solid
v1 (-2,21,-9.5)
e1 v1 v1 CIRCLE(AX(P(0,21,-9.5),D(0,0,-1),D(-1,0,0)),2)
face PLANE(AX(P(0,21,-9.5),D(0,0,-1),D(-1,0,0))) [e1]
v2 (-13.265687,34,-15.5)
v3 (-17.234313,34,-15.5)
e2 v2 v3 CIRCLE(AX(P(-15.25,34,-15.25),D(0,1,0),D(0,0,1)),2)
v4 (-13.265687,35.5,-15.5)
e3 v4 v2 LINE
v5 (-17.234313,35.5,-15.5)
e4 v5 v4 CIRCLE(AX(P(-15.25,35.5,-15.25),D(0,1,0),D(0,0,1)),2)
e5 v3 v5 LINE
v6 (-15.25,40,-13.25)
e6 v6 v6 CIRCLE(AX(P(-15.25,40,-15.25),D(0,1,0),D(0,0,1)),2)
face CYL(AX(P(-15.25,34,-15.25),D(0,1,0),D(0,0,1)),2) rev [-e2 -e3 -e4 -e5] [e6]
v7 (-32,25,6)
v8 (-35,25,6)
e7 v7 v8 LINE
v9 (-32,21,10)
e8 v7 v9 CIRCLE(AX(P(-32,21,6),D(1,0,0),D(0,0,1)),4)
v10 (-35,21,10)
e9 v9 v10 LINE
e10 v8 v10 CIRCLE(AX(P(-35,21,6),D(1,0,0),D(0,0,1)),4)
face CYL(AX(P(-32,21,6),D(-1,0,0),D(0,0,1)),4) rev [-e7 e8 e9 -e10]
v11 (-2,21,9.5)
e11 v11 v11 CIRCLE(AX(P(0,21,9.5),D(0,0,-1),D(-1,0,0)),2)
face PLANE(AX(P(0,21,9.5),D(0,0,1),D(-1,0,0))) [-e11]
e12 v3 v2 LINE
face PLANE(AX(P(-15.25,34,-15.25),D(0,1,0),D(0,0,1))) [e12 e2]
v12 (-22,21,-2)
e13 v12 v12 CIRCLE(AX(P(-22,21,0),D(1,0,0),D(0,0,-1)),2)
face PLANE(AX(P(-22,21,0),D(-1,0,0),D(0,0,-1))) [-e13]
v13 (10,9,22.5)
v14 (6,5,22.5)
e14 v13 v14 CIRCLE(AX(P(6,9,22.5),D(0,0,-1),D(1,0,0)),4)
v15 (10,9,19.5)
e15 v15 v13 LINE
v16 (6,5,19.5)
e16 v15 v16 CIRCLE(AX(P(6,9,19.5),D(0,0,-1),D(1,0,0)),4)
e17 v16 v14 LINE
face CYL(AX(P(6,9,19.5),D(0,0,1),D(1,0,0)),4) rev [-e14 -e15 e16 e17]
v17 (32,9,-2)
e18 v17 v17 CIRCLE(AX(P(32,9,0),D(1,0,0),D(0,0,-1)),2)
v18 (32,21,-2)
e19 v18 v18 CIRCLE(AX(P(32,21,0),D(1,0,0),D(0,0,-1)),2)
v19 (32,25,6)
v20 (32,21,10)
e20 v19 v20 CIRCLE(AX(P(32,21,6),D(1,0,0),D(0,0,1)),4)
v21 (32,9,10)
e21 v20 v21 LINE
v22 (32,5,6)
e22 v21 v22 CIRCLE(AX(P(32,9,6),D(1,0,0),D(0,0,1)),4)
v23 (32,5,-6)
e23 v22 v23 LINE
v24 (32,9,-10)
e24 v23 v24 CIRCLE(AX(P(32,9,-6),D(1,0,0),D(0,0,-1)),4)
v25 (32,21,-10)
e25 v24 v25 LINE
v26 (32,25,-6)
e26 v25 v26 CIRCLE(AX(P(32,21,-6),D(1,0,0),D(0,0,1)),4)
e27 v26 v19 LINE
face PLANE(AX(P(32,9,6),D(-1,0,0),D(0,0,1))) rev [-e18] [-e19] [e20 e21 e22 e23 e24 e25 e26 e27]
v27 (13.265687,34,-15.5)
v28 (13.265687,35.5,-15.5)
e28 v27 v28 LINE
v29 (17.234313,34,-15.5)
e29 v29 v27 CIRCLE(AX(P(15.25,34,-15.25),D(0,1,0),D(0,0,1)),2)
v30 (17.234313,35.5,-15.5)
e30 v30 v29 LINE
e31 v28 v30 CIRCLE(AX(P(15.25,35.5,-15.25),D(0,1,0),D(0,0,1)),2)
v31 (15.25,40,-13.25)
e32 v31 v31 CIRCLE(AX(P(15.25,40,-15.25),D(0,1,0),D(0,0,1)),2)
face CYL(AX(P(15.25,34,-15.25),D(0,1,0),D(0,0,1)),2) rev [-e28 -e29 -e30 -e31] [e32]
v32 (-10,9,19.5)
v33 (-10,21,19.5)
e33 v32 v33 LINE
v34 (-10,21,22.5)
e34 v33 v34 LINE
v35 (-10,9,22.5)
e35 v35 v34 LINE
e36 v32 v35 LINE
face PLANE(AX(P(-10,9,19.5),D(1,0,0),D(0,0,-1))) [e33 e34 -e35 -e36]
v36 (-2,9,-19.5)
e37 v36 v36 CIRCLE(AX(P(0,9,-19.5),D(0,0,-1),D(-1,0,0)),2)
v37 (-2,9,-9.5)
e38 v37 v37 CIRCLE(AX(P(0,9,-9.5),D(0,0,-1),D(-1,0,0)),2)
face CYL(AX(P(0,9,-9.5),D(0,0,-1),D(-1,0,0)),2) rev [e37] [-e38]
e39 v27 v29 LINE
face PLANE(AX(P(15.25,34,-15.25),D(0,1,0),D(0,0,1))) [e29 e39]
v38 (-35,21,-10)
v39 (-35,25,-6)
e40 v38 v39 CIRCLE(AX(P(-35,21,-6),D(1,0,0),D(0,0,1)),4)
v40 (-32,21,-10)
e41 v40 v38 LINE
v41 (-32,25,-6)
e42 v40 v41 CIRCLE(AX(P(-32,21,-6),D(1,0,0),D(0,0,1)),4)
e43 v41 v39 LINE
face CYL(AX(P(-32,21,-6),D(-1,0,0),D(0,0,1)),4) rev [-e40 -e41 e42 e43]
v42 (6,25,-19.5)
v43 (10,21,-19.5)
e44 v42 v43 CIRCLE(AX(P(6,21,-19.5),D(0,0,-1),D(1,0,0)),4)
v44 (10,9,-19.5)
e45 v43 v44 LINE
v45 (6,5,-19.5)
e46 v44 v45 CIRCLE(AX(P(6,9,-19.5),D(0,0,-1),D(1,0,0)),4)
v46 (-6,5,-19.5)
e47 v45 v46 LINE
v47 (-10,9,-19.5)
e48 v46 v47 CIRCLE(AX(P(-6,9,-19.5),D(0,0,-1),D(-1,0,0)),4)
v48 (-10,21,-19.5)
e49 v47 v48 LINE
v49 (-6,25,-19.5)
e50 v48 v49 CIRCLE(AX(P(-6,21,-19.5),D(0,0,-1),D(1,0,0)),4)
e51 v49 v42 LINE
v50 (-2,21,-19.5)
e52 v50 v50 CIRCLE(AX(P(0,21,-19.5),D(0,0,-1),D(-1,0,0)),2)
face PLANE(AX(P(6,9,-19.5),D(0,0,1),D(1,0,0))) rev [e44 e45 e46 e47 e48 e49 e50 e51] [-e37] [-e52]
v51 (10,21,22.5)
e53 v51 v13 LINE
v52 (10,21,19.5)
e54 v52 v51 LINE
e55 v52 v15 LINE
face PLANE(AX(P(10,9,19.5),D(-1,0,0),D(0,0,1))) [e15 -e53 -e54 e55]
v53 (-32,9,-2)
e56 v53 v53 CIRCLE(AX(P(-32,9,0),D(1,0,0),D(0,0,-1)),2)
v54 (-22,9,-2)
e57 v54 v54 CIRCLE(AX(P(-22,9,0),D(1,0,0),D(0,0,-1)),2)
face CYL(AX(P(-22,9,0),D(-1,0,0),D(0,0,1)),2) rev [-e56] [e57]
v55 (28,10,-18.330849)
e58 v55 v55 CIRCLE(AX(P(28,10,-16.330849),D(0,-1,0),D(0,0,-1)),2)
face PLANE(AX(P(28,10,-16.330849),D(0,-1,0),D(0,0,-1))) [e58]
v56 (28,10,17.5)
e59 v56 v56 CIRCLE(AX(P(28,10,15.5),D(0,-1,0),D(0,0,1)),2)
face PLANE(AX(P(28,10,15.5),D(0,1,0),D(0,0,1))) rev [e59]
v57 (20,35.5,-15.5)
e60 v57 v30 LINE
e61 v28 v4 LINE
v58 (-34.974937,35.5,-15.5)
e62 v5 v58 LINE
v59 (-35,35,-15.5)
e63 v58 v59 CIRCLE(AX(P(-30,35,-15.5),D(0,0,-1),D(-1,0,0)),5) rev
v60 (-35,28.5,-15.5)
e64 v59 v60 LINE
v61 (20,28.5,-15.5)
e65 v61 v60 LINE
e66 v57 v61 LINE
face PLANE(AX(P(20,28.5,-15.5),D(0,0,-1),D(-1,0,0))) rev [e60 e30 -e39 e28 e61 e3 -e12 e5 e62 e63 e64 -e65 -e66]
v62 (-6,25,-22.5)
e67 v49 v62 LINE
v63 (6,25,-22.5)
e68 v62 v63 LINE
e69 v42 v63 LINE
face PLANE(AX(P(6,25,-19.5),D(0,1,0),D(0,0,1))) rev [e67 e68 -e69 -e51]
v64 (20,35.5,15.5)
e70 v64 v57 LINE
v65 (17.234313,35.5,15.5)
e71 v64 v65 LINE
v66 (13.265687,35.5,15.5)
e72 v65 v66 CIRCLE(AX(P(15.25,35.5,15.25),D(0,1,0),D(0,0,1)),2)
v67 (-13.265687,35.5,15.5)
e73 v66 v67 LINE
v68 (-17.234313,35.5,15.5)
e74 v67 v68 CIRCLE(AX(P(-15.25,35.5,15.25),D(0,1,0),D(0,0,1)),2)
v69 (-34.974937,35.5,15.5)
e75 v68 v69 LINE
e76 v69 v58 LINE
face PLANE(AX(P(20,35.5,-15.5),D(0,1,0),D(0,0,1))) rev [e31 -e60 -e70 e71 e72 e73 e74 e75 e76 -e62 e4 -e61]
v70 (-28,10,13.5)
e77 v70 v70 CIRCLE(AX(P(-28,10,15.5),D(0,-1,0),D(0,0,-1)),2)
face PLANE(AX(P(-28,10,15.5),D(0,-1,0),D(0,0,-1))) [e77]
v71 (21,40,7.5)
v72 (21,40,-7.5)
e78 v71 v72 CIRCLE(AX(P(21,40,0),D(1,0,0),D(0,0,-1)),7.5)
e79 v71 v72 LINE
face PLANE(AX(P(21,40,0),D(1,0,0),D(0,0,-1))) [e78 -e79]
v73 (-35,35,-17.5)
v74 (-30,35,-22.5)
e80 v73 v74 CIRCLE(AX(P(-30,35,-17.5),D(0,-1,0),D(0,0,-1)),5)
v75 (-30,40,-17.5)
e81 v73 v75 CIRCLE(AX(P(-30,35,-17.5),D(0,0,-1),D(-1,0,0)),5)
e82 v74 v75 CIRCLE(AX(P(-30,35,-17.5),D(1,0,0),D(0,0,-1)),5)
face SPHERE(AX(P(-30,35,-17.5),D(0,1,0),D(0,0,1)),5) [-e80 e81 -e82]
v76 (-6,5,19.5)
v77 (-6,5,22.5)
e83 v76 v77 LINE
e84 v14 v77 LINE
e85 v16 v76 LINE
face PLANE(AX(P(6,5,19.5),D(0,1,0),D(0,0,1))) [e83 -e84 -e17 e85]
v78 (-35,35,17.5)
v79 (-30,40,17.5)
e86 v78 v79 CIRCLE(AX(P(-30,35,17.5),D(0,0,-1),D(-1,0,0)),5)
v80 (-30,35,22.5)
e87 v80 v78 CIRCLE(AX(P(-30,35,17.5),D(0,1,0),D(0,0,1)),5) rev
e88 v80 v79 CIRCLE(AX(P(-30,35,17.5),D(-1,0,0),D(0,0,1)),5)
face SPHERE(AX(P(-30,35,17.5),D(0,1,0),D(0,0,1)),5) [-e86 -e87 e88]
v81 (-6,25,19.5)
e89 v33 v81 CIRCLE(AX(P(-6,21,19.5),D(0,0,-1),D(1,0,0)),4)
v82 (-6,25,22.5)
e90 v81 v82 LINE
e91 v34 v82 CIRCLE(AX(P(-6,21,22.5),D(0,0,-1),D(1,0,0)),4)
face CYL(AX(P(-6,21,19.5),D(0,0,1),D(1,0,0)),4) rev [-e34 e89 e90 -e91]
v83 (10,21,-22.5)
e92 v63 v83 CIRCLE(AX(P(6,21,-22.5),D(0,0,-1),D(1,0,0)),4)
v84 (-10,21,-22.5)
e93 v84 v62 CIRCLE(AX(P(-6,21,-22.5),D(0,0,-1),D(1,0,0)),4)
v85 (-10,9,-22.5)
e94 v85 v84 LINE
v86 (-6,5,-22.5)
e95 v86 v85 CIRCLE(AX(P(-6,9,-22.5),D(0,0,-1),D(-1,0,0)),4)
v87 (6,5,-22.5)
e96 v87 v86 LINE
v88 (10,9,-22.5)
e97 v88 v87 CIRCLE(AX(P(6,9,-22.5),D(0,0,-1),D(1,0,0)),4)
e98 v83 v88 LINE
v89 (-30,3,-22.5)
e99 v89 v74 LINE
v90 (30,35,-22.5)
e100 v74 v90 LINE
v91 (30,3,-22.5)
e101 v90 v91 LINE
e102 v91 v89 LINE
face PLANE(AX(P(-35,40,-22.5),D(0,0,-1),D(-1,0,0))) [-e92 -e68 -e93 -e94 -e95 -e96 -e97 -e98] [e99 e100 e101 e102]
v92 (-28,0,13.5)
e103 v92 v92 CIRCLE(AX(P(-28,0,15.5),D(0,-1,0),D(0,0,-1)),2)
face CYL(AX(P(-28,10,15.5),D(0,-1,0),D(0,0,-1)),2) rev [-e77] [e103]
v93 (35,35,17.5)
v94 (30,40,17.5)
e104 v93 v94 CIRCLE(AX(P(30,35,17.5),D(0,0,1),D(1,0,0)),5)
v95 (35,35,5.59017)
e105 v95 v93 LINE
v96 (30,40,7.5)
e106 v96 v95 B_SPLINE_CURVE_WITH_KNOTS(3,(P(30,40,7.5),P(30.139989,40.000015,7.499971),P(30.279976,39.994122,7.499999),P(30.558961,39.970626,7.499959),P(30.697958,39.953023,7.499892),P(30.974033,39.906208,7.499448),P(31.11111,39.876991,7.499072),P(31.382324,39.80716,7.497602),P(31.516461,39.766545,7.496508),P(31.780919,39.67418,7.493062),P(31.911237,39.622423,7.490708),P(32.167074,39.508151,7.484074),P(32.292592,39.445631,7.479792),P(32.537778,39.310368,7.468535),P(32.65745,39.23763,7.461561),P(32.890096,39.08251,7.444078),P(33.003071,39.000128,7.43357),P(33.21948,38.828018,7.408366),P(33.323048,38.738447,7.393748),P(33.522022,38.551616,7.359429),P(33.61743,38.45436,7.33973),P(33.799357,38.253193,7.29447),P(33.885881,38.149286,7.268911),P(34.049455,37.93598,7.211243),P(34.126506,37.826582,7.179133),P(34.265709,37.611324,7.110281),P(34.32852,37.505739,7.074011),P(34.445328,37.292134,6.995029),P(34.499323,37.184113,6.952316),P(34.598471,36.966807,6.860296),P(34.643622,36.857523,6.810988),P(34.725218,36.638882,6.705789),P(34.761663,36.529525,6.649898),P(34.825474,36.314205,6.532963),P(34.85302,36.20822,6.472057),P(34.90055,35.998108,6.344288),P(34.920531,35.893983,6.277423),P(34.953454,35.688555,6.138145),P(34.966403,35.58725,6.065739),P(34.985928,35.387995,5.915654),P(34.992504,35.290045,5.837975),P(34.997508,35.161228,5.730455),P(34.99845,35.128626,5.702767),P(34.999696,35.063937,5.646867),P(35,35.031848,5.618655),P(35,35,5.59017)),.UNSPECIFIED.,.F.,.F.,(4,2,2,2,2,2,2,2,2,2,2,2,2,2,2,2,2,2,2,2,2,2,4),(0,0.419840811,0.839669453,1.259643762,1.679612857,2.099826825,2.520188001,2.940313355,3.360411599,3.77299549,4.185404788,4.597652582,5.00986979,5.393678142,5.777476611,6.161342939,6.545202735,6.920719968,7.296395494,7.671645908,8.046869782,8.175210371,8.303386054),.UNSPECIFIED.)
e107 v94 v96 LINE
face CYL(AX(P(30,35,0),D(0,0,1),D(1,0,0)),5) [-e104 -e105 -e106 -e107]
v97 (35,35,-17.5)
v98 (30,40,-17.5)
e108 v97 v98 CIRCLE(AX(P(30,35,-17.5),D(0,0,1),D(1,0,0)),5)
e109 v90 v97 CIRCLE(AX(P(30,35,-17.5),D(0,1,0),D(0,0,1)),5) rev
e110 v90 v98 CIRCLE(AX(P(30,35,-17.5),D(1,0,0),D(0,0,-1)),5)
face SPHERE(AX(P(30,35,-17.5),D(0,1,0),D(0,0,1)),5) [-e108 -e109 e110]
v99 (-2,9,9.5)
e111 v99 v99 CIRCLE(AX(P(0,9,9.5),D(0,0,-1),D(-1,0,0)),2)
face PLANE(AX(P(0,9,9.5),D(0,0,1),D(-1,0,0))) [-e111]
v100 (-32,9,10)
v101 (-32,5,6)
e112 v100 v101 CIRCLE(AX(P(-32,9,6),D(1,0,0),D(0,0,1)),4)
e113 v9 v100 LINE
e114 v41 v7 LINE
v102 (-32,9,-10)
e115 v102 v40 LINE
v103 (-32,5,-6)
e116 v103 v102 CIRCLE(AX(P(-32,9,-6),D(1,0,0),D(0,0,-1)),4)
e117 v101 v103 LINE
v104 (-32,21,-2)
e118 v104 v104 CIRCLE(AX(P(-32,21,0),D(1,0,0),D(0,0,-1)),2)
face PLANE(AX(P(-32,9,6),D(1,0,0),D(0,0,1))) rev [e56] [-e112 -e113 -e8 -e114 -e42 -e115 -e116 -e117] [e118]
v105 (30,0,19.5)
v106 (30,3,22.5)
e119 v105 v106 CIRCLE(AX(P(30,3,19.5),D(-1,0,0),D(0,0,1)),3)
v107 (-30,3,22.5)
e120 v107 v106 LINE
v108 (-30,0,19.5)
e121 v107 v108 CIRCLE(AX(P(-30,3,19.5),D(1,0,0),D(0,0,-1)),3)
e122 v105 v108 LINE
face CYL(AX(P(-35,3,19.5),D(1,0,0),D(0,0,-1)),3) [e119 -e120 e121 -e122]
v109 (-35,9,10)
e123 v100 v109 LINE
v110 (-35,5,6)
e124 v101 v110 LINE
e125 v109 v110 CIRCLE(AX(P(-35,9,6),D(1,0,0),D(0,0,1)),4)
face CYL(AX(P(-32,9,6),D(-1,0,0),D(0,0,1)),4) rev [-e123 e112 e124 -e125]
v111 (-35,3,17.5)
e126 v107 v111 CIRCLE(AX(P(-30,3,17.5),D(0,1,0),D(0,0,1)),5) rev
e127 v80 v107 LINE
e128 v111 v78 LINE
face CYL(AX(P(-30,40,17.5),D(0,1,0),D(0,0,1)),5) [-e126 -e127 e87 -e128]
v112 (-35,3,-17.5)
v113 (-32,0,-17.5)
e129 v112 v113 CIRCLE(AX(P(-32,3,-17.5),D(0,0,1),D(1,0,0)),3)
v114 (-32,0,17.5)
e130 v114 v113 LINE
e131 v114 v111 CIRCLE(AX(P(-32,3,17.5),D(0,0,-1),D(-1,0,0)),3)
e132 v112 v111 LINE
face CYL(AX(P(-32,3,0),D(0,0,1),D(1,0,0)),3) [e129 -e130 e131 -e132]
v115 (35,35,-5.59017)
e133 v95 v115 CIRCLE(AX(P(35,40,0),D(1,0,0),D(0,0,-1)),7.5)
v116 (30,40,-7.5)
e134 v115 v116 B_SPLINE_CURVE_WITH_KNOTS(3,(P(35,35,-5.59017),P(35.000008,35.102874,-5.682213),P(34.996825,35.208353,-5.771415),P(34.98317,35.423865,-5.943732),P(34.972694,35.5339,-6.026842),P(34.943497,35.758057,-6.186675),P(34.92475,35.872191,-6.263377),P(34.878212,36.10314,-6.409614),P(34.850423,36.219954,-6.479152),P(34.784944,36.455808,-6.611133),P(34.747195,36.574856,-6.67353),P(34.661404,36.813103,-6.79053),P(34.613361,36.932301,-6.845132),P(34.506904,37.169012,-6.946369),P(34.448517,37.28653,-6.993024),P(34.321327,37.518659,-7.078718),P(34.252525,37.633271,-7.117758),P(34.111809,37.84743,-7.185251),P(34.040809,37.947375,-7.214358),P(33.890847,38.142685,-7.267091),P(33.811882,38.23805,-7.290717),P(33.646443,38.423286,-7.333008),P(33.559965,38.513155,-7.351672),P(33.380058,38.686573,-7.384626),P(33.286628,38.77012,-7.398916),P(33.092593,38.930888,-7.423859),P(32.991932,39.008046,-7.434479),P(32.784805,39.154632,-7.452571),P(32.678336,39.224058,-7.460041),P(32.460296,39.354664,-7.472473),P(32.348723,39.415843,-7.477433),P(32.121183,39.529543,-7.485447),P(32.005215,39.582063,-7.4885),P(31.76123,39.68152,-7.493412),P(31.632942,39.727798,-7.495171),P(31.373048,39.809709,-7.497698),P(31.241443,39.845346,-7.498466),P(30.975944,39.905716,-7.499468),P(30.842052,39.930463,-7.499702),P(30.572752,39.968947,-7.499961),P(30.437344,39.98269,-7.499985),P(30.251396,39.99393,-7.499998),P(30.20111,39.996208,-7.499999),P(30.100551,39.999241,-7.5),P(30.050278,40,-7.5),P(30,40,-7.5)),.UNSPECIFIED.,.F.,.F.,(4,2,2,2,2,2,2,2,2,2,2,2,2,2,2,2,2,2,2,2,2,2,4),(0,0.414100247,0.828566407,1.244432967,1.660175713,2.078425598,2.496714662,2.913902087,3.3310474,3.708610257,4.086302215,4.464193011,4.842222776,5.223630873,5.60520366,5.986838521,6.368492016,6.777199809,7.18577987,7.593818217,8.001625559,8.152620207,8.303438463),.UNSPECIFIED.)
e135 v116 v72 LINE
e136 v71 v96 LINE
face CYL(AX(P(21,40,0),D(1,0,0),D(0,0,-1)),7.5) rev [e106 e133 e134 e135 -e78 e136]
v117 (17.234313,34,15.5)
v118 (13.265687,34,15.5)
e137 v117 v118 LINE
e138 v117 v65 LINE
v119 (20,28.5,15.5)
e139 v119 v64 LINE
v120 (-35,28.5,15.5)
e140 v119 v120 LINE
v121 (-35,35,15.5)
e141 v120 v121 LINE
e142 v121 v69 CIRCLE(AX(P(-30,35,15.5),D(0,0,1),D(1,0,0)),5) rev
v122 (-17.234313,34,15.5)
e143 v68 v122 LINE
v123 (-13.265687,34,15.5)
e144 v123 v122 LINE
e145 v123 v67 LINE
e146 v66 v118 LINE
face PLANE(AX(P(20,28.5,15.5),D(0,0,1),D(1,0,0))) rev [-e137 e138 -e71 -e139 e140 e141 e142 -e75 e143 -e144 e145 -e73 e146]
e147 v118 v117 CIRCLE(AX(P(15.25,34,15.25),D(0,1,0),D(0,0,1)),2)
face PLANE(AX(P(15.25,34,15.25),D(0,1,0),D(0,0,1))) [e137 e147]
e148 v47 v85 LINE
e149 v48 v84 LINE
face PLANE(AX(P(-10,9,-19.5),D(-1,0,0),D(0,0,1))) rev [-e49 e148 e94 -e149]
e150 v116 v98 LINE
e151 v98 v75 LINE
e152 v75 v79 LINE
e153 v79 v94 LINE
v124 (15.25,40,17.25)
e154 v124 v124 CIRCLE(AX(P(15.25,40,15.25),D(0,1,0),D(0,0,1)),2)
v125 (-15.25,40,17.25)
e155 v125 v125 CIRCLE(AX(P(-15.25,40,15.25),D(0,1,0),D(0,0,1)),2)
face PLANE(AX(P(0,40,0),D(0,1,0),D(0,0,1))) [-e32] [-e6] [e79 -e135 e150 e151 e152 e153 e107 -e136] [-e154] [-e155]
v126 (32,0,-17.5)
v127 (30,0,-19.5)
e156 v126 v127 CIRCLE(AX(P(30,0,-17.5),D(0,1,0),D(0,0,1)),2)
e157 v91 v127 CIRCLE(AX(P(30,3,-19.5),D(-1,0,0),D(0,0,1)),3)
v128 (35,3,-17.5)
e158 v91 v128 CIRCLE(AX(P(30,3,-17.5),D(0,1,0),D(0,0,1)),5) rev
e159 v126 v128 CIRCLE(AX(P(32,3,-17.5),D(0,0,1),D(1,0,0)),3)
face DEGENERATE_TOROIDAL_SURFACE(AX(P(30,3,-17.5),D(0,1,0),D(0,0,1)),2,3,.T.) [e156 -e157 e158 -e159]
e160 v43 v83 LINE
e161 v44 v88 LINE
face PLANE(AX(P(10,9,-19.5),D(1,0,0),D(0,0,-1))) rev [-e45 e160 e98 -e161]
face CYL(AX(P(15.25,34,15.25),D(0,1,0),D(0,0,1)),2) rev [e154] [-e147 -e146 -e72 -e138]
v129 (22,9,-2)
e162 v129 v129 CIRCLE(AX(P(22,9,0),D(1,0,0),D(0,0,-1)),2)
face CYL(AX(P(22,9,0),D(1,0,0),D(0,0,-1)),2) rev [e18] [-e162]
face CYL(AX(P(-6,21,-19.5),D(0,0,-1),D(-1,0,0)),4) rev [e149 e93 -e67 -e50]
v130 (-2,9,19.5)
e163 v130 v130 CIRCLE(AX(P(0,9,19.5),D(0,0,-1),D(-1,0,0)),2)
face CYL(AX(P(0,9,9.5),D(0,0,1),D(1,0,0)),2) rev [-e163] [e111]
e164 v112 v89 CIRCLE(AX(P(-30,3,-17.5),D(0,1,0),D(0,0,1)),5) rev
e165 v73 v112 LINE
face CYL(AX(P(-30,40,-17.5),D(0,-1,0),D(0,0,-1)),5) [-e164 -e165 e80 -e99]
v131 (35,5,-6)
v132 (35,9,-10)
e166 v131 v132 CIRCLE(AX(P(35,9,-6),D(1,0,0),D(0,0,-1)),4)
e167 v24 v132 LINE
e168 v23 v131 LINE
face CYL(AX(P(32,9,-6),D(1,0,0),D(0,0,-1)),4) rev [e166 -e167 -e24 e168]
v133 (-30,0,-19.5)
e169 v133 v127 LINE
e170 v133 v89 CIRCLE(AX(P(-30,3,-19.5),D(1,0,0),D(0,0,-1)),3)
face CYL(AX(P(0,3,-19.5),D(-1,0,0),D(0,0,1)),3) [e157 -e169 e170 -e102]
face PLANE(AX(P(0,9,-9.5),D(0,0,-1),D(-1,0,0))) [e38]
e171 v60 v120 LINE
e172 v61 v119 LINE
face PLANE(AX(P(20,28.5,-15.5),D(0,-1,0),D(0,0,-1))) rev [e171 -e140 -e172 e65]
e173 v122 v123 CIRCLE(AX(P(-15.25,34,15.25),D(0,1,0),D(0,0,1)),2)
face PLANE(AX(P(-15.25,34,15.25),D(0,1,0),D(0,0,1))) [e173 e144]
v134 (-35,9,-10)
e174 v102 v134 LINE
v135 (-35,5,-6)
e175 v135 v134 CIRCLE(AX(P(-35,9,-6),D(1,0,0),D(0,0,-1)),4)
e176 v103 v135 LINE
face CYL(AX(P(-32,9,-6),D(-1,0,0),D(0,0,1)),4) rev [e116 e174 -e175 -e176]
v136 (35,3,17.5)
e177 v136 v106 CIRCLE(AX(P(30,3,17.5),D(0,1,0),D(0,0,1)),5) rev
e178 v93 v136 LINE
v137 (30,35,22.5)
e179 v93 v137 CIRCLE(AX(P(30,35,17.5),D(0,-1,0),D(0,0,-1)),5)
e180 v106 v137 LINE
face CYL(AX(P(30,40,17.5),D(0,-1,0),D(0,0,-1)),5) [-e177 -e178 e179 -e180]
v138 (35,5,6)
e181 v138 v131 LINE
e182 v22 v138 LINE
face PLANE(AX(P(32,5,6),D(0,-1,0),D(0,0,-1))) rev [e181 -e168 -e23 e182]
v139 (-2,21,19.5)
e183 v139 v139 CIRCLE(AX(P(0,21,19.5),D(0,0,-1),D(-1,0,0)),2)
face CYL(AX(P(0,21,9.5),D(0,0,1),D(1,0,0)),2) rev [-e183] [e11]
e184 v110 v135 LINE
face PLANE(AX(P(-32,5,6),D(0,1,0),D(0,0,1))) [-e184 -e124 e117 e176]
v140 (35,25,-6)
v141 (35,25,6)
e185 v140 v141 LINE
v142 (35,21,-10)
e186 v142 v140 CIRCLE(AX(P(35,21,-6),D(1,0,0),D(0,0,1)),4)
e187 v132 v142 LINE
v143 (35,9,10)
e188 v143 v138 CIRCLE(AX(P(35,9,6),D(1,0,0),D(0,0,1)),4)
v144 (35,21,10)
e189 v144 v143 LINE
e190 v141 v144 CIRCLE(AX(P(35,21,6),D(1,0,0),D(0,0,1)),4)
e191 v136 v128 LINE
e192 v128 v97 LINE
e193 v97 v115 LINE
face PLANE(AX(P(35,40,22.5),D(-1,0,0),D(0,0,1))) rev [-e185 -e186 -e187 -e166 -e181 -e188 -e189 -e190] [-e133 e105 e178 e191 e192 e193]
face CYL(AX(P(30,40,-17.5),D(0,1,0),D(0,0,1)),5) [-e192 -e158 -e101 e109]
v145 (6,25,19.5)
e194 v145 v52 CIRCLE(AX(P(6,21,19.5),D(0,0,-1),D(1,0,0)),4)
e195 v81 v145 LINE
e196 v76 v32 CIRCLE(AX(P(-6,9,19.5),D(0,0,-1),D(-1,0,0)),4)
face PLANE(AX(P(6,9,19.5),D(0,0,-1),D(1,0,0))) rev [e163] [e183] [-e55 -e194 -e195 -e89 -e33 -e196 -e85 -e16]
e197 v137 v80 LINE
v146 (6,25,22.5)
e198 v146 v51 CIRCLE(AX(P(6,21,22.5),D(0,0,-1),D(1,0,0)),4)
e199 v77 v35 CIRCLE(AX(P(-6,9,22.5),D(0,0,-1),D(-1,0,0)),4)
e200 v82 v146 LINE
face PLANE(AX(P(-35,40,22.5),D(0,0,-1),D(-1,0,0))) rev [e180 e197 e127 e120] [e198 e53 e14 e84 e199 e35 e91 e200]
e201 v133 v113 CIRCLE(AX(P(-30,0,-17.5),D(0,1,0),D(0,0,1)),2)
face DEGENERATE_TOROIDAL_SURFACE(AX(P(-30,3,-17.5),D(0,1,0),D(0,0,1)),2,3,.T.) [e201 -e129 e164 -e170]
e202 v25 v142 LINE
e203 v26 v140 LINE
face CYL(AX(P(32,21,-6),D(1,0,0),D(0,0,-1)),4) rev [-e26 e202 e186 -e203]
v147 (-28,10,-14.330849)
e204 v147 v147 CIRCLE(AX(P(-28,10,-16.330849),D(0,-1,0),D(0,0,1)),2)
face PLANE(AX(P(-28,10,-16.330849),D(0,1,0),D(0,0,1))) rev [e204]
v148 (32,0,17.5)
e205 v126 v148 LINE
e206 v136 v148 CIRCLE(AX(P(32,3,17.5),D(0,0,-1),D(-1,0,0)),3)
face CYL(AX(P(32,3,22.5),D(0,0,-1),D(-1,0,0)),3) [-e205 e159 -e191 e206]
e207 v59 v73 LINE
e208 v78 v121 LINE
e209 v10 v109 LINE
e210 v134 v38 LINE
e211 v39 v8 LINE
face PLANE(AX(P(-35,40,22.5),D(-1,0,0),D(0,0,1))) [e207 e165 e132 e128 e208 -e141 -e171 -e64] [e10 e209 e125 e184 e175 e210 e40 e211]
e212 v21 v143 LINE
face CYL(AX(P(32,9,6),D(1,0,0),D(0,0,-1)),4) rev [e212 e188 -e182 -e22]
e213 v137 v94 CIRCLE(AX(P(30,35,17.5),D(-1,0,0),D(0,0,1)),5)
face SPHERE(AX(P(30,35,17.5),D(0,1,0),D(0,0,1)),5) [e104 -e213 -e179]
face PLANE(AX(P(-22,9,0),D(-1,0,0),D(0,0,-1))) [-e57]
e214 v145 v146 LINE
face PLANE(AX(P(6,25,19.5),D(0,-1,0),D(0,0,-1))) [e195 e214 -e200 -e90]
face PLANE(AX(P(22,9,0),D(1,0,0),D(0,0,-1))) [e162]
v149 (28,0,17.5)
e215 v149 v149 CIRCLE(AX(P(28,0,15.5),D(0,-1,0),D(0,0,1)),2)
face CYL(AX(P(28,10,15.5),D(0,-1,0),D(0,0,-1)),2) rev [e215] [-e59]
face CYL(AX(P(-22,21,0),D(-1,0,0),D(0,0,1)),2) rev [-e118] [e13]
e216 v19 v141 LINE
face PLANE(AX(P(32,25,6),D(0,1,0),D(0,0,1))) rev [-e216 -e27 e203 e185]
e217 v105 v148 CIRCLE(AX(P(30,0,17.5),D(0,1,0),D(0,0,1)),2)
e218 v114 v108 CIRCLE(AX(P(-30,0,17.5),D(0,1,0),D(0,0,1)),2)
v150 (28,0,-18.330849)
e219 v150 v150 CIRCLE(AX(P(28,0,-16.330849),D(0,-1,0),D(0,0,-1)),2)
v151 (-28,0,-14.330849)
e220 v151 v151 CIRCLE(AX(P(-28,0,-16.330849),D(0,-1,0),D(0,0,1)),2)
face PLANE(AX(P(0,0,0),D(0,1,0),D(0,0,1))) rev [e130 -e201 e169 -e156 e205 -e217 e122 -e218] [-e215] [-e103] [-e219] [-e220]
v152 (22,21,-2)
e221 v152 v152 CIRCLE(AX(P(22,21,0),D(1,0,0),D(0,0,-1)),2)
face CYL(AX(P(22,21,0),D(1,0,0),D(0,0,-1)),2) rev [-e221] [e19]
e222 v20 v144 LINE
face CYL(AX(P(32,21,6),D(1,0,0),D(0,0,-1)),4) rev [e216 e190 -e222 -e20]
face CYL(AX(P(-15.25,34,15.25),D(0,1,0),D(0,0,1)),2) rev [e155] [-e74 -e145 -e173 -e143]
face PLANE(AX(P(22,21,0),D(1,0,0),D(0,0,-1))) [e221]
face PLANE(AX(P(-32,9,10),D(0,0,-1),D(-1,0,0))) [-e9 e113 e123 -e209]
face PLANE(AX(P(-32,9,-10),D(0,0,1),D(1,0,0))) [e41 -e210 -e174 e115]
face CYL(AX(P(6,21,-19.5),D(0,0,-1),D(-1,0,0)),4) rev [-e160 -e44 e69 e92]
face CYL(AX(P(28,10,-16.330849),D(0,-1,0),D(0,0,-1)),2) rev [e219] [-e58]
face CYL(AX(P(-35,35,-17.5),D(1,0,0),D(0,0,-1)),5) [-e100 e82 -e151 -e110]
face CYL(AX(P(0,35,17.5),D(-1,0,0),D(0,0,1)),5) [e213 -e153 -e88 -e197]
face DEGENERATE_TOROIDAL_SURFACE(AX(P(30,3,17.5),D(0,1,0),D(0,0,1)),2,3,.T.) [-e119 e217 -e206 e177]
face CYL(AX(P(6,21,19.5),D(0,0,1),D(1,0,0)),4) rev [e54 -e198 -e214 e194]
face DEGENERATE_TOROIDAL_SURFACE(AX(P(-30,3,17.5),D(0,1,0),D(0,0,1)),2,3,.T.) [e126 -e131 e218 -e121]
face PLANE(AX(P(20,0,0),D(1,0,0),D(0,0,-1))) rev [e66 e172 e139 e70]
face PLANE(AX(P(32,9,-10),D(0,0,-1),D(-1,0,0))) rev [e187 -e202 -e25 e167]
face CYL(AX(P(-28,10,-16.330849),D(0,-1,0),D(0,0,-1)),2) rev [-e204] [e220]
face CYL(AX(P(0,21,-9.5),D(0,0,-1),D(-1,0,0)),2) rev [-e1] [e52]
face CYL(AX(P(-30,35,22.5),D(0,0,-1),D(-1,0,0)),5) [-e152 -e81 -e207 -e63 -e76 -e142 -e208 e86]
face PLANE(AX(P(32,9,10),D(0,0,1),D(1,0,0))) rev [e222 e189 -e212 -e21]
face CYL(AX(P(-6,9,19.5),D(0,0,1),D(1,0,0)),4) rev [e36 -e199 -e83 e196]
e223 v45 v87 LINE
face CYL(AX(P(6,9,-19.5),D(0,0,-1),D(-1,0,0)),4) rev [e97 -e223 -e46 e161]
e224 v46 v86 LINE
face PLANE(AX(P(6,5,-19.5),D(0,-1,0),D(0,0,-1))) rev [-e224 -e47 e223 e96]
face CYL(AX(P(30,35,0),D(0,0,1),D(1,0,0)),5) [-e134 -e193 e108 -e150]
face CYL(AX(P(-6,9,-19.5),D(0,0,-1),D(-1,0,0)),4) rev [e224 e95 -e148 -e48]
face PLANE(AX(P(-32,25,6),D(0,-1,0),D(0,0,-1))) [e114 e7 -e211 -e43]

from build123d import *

# Parameters (mm, degrees)
SKETCH1_W           = 70
SKETCH1_H           = 45
BOSS_EXTRUDE1_DEPTH = 40
SKETCH2_R           = 2
CUT_EXTRUDE1_DEPTH  = 10
CUT_EXTRUDE2_DEPTH  = 3
SKETCH4_R           = 2
CUT_EXTRUDE3_DEPTH  = 10
CUT_EXTRUDE4_DEPTH  = 3
SKETCH8_R           = 2
CUT_EXTRUDE5_DEPTH  = 10
FILLET1_R           = 3
FILLET2_R           = 5
SKETCH9_W           = 31
SKETCH9_H           = 7
CUT_EXTRUDE6_DEPTH  = 55
SKETCH10_R          = 2
CUT_EXTRUDE7_DEPTH  = 6
SKETCH11_R          = 7.5
CUT_EXTRUDE8_DEPTH  = 14
FILLET3_R           = 5


with BuildPart() as part:
    # Sketch1 → Boss-Extrude1 (new body)
    with BuildSketch(Plane(origin=(0, 0, 0), x_dir=(1, 0, 0), z_dir=(0, 1, 0))):
        Rectangle(SKETCH1_W, SKETCH1_H)
    extrude(amount=BOSS_EXTRUDE1_DEPTH)

    # Sketch2 → Cut-Extrude1 (cut)
    with BuildSketch(Plane.XZ):
        with Locations(Location((-28, 15.5, 0), (0, 0, 270))):
            Circle(SKETCH2_R)
        with Locations(Location((28, 15.5, 0), (0, 0, 90))):
            Circle(SKETCH2_R)
        with Locations(Location((28, -16.330849274, 0), (0, 0, 270))):
            Circle(SKETCH2_R)
        with Locations(Location((-28, -16.330849274, 0), (0, 0, 90))):
            Circle(SKETCH2_R)
    extrude(amount=-CUT_EXTRUDE1_DEPTH, mode=Mode.SUBTRACT)

    # Sketch3 → Cut-Extrude2 (cut)
    with BuildSketch(Plane(origin=(35, 0, 0), x_dir=(0, 0, -1), z_dir=(1, 0, 0))):
        with BuildLine():
            Line((-6, 5), (6, 5))
            ThreePointArc((6, 5), (8.828427125, 6.171572875), (10, 9))
            Line((10, 9), (10, 21))
            ThreePointArc((10, 21), (8.828427125, 23.828427125), (6, 25))
            Line((6, 25), (-6, 25))
            ThreePointArc((-6, 25), (-8.828427125, 23.828427125), (-10, 21))
            Line((-10, 21), (-10, 9))
            ThreePointArc((-10, 9), (-8.828427125, 6.171572875), (-6, 5))
        make_face()
    cut_extrude2 = extrude(amount=-CUT_EXTRUDE2_DEPTH, mode=Mode.SUBTRACT)

    # Sketch4 → Cut-Extrude3 (cut)
    with BuildSketch(Plane(origin=(32, 0, 0), x_dir=(0, 0, -1), z_dir=(1, 0, 0))):
        with Locations((0, 21)):
            Circle(SKETCH4_R)
        with Locations((0, 9)):
            Circle(SKETCH4_R)
    cut_extrude3 = extrude(amount=-CUT_EXTRUDE3_DEPTH, mode=Mode.SUBTRACT)

    # Mirror1: Cut-Extrude2, Cut-Extrude3 across plane
    add(cut_extrude2.mirror(Plane(origin=(0, 0, 0), x_dir=(0, 0, 1), z_dir=(1, 0, 0))), mode=Mode.SUBTRACT)
    add(cut_extrude3.mirror(Plane(origin=(0, 0, 0), x_dir=(0, 0, 1), z_dir=(1, 0, 0))), mode=Mode.SUBTRACT)

    # Sketch7 → Cut-Extrude4 (cut)
    with BuildSketch(Plane(origin=(0, 0, -22.5), x_dir=(-1, 0, 0), z_dir=(0, 0, -1))):
        with BuildLine():
            Line((-6, 5), (6, 5))
            ThreePointArc((6, 5), (8.828427125, 6.171572875), (10, 9))
            Line((10, 9), (10, 21))
            ThreePointArc((10, 21), (8.828427125, 23.828427125), (6, 25))
            Line((6, 25), (-6, 25))
            ThreePointArc((-6, 25), (-8.828427125, 23.828427125), (-10, 21))
            Line((-10, 21), (-10, 9))
            ThreePointArc((-10, 9), (-8.828427125, 6.171572875), (-6, 5))
        make_face()
    cut_extrude4 = extrude(amount=-CUT_EXTRUDE4_DEPTH, mode=Mode.SUBTRACT)

    # Sketch8 → Cut-Extrude5 (cut)
    with BuildSketch(Plane(origin=(0, 0, -19.5), x_dir=(-1, 0, 0), z_dir=(0, 0, -1))):
        with Locations((0, 21)):
            Circle(SKETCH8_R)
        with Locations((0, 9)):
            Circle(SKETCH8_R)
    cut_extrude5 = extrude(amount=-CUT_EXTRUDE5_DEPTH, mode=Mode.SUBTRACT)

    # Mirror2: Cut-Extrude4, Cut-Extrude5 across plane
    add(cut_extrude4.mirror(Plane.XY), mode=Mode.SUBTRACT)
    add(cut_extrude5.mirror(Plane.XY), mode=Mode.SUBTRACT)

    # Fillet1
    fillet1_edges = [part.edges().sort_by_distance(p)[0] for p in [
        (-35, 0, 0),
        (0, 0, -22.5),
        (35, 0, 0),
        (0, 0, 22.5),
    ]]
    fillet(fillet1_edges, radius=FILLET1_R)

    # Fillet2
    # the kernel refuses this fillet: 5 mm, written as the material it takes off along each edge
    with BuildSketch(Plane(origin=(-30, 0, 17.5), x_dir=(0, 0, 1), z_dir=(1, 0, 0))) as fillet2_piece_1:
        with BuildLine():
            CenterArc((2, -3), 3, 0, 90)
            Line((5, -3), (5, 0))
            Line((5, 0), (2, 0))
        make_face()
    revolve(axis=Axis((-30, 0, 17.5), (0, -1, 0)), revolution_arc=90, mode=Mode.SUBTRACT)
    with BuildSketch(Plane(origin=(-30, 0, -17.5), x_dir=(-1, 0, 0), z_dir=(0, 0, 1))) as fillet2_piece_2:
        with BuildLine():
            CenterArc((2, -3), 3, 0, 90)
            Line((5, -3), (5, 0))
            Line((5, 0), (2, 0))
        make_face()
    revolve(axis=Axis((-30, 0, -17.5), (0, -1, 0)), revolution_arc=90, mode=Mode.SUBTRACT)
    with BuildSketch(Plane(origin=(30, 0, 17.5), x_dir=(1, 0, 0), z_dir=(0, 0, -1))) as fillet2_piece_3:
        with BuildLine():
            CenterArc((2, -3), 3, 0, 90)
            Line((5, -3), (5, 0))
            Line((5, 0), (2, 0))
        make_face()
    revolve(axis=Axis((30, 0, 17.5), (0, -1, 0)), revolution_arc=90, mode=Mode.SUBTRACT)
    with BuildSketch(Plane(origin=(30, 0, -17.5), x_dir=(0, 0, -1), z_dir=(-1, 0, 0))) as fillet2_piece_4:
        with BuildLine():
            CenterArc((2, -3), 3, 0, 90)
            Line((5, -3), (5, 0))
            Line((5, 0), (2, 0))
        make_face()
    revolve(axis=Axis((30, 0, -17.5), (0, -1, 0)), revolution_arc=90, mode=Mode.SUBTRACT)
    with BuildSketch(Plane(origin=(-35, 0, 22.5), x_dir=(1, 0, 0), z_dir=(0, 1, 0)), Plane(origin=(-35, 0, -22.5), x_dir=(0, 0, 1), z_dir=(0, 1, 0))) as fillet2_piece_5:
        with BuildLine():
            CenterArc((FILLET2_R, FILLET2_R), FILLET2_R, 180, 90)
            Line((0, FILLET2_R), (0, 0))
            Line((0, 0), (FILLET2_R, 0))
        make_face()
    extrude(amount=52.5, mode=Mode.SUBTRACT)
    with BuildSketch(Plane(origin=(35, 0, -22.5), x_dir=(0, 0, 1), z_dir=(0, 1, 0)), Plane(origin=(35, 0, 22.5), x_dir=(-1, 0, 0), z_dir=(0, 1, 0))) as fillet2_piece_6:
        with BuildLine():
            CenterArc((FILLET2_R, -FILLET2_R), FILLET2_R, 90, 90)
            Line((0, -FILLET2_R), (0, 0))
            Line((0, 0), (FILLET2_R, 0))
        make_face()
    extrude(amount=52.5, mode=Mode.SUBTRACT)

    # Sketch9 → Cut-Extrude6 (cut)
    with BuildSketch(Plane.ZY.offset(35)):
        with Locations((0, 32)):
            Rectangle(SKETCH9_W, SKETCH9_H)
    extrude(amount=-CUT_EXTRUDE6_DEPTH, mode=Mode.SUBTRACT)

    # Sketch10 → Cut-Extrude7 (cut)
    with BuildSketch(Plane(origin=(0, 40, 0), x_dir=(1, 0, 0), z_dir=(0, 1, 0))):
        with Locations(Location((15.25, 15.25, 0), (0, 0, 270))):
            Circle(SKETCH10_R)
        with Locations(Location((15.25, -15.25, 0), (0, 0, 270))):
            Circle(SKETCH10_R)
        with Locations(Location((-15.25, 15.25, 0), (0, 0, 270))):
            Circle(SKETCH10_R)
        with Locations(Location((-15.25, -15.25, 0), (0, 0, 270))):
            Circle(SKETCH10_R)
    extrude(amount=-CUT_EXTRUDE7_DEPTH, mode=Mode.SUBTRACT)

    # Sketch11 → Cut-Extrude8 (cut)
    with BuildSketch(Plane(origin=(35, 0, 0), x_dir=(0, 0, -1), z_dir=(1, 0, 0))):
        with Locations((0, 40)):
            Circle(SKETCH11_R)
    extrude(amount=-CUT_EXTRUDE8_DEPTH, mode=Mode.SUBTRACT)

    # Fillet3
    # the kernel refuses this fillet: 5 mm, written as the material it takes off along each edge
    with BuildSketch(Plane(origin=(35, 40, 5), x_dir=(-1, 0, 0), z_dir=(0, 0, -1)), Plane(origin=(35, 40, 17.5), x_dir=(-1, 0, 0), z_dir=(0, 0, -1))) as fillet3_piece_1:
        with BuildLine():
            CenterArc((FILLET3_R, -FILLET3_R), FILLET3_R, 90, 90)
            Line((0, -FILLET3_R), (0, 0))
            Line((0, 0), (FILLET3_R, 0))
        make_face()
    extrude(amount=22.5, mode=Mode.SUBTRACT)
    with BuildSketch(Plane(origin=(30, 40, -17.5), x_dir=(0, 0, -1), z_dir=(-1, 0, 0))) as fillet3_piece_2:
        with BuildLine():
            CenterArc((5 - FILLET3_R, FILLET3_R), FILLET3_R, 270, 90)
            Line((5, FILLET3_R), (5, 0))
            Line((5, 0), (5 - FILLET3_R, 0))
        make_face()
    revolve(axis=Axis((30, 40, -17.5), (0, -1, 0)), revolution_arc=90, mode=Mode.SUBTRACT)
    with BuildSketch(Plane(origin=(30, 40, -22.5), x_dir=(0, 0, 1), z_dir=(-1, 0, 0))) as fillet3_piece_3:
        with BuildLine():
            CenterArc((FILLET3_R, -FILLET3_R), FILLET3_R, 90, 90)
            Line((0, -FILLET3_R), (0, 0))
            Line((0, 0), (FILLET3_R, 0))
        make_face()
    extrude(amount=60, mode=Mode.SUBTRACT)
    with BuildSketch(Plane(origin=(-30, 40, -17.5), x_dir=(-1, 0, 0), z_dir=(0, 0, 1))) as fillet3_piece_4:
        with BuildLine():
            CenterArc((5 - FILLET3_R, FILLET3_R), FILLET3_R, 270, 90)
            Line((5, FILLET3_R), (5, 0))
            Line((5, 0), (5 - FILLET3_R, 0))
        make_face()
    revolve(axis=Axis((-30, 40, -17.5), (0, -1, 0)), revolution_arc=90, mode=Mode.SUBTRACT)
    with BuildSketch(Plane(origin=(-35, 40, -17.5), x_dir=(1, 0, 0), z_dir=(0, 0, 1))) as fillet3_piece_5:
        with BuildLine():
            CenterArc((FILLET3_R, -FILLET3_R), FILLET3_R, 90, 90)
            Line((0, -FILLET3_R), (0, 0))
            Line((0, 0), (FILLET3_R, 0))
        make_face()
    extrude(amount=35, mode=Mode.SUBTRACT)
    with BuildSketch(Plane(origin=(-30, 40, 17.5), x_dir=(0, 0, 1), z_dir=(1, 0, 0))) as fillet3_piece_6:
        with BuildLine():
            CenterArc((5 - FILLET3_R, FILLET3_R), FILLET3_R, 270, 90)
            Line((5, FILLET3_R), (5, 0))
            Line((5, 0), (5 - FILLET3_R, 0))
        make_face()
    revolve(axis=Axis((-30, 40, 17.5), (0, -1, 0)), revolution_arc=90, mode=Mode.SUBTRACT)
    with BuildSketch(Plane(origin=(30, 40, 17.5), x_dir=(1, 0, 0), z_dir=(0, 0, -1))) as fillet3_piece_7:
        with BuildLine():
            CenterArc((5 - FILLET3_R, FILLET3_R), FILLET3_R, 270, 90)
            Line((5 - FILLET3_R, 0), (5, 0))
            Line((5, 0), (5, FILLET3_R))
        make_face()
    revolve(axis=Axis((30, 40, 17.5), (0, -1, 0)), revolution_arc=90, mode=Mode.SUBTRACT)
    with BuildSketch(Plane(origin=(-30, 40, 22.5), x_dir=(0, -1, 0), z_dir=(1, 0, 0))) as fillet3_piece_8:
        with BuildLine():
            CenterArc((FILLET3_R, FILLET3_R), FILLET3_R, 180, 90)
            Line((0, FILLET3_R), (0, 0))
            Line((0, 0), (FILLET3_R, 0))
        make_face()
    extrude(amount=60, mode=Mode.SUBTRACT)


solid = part.part
